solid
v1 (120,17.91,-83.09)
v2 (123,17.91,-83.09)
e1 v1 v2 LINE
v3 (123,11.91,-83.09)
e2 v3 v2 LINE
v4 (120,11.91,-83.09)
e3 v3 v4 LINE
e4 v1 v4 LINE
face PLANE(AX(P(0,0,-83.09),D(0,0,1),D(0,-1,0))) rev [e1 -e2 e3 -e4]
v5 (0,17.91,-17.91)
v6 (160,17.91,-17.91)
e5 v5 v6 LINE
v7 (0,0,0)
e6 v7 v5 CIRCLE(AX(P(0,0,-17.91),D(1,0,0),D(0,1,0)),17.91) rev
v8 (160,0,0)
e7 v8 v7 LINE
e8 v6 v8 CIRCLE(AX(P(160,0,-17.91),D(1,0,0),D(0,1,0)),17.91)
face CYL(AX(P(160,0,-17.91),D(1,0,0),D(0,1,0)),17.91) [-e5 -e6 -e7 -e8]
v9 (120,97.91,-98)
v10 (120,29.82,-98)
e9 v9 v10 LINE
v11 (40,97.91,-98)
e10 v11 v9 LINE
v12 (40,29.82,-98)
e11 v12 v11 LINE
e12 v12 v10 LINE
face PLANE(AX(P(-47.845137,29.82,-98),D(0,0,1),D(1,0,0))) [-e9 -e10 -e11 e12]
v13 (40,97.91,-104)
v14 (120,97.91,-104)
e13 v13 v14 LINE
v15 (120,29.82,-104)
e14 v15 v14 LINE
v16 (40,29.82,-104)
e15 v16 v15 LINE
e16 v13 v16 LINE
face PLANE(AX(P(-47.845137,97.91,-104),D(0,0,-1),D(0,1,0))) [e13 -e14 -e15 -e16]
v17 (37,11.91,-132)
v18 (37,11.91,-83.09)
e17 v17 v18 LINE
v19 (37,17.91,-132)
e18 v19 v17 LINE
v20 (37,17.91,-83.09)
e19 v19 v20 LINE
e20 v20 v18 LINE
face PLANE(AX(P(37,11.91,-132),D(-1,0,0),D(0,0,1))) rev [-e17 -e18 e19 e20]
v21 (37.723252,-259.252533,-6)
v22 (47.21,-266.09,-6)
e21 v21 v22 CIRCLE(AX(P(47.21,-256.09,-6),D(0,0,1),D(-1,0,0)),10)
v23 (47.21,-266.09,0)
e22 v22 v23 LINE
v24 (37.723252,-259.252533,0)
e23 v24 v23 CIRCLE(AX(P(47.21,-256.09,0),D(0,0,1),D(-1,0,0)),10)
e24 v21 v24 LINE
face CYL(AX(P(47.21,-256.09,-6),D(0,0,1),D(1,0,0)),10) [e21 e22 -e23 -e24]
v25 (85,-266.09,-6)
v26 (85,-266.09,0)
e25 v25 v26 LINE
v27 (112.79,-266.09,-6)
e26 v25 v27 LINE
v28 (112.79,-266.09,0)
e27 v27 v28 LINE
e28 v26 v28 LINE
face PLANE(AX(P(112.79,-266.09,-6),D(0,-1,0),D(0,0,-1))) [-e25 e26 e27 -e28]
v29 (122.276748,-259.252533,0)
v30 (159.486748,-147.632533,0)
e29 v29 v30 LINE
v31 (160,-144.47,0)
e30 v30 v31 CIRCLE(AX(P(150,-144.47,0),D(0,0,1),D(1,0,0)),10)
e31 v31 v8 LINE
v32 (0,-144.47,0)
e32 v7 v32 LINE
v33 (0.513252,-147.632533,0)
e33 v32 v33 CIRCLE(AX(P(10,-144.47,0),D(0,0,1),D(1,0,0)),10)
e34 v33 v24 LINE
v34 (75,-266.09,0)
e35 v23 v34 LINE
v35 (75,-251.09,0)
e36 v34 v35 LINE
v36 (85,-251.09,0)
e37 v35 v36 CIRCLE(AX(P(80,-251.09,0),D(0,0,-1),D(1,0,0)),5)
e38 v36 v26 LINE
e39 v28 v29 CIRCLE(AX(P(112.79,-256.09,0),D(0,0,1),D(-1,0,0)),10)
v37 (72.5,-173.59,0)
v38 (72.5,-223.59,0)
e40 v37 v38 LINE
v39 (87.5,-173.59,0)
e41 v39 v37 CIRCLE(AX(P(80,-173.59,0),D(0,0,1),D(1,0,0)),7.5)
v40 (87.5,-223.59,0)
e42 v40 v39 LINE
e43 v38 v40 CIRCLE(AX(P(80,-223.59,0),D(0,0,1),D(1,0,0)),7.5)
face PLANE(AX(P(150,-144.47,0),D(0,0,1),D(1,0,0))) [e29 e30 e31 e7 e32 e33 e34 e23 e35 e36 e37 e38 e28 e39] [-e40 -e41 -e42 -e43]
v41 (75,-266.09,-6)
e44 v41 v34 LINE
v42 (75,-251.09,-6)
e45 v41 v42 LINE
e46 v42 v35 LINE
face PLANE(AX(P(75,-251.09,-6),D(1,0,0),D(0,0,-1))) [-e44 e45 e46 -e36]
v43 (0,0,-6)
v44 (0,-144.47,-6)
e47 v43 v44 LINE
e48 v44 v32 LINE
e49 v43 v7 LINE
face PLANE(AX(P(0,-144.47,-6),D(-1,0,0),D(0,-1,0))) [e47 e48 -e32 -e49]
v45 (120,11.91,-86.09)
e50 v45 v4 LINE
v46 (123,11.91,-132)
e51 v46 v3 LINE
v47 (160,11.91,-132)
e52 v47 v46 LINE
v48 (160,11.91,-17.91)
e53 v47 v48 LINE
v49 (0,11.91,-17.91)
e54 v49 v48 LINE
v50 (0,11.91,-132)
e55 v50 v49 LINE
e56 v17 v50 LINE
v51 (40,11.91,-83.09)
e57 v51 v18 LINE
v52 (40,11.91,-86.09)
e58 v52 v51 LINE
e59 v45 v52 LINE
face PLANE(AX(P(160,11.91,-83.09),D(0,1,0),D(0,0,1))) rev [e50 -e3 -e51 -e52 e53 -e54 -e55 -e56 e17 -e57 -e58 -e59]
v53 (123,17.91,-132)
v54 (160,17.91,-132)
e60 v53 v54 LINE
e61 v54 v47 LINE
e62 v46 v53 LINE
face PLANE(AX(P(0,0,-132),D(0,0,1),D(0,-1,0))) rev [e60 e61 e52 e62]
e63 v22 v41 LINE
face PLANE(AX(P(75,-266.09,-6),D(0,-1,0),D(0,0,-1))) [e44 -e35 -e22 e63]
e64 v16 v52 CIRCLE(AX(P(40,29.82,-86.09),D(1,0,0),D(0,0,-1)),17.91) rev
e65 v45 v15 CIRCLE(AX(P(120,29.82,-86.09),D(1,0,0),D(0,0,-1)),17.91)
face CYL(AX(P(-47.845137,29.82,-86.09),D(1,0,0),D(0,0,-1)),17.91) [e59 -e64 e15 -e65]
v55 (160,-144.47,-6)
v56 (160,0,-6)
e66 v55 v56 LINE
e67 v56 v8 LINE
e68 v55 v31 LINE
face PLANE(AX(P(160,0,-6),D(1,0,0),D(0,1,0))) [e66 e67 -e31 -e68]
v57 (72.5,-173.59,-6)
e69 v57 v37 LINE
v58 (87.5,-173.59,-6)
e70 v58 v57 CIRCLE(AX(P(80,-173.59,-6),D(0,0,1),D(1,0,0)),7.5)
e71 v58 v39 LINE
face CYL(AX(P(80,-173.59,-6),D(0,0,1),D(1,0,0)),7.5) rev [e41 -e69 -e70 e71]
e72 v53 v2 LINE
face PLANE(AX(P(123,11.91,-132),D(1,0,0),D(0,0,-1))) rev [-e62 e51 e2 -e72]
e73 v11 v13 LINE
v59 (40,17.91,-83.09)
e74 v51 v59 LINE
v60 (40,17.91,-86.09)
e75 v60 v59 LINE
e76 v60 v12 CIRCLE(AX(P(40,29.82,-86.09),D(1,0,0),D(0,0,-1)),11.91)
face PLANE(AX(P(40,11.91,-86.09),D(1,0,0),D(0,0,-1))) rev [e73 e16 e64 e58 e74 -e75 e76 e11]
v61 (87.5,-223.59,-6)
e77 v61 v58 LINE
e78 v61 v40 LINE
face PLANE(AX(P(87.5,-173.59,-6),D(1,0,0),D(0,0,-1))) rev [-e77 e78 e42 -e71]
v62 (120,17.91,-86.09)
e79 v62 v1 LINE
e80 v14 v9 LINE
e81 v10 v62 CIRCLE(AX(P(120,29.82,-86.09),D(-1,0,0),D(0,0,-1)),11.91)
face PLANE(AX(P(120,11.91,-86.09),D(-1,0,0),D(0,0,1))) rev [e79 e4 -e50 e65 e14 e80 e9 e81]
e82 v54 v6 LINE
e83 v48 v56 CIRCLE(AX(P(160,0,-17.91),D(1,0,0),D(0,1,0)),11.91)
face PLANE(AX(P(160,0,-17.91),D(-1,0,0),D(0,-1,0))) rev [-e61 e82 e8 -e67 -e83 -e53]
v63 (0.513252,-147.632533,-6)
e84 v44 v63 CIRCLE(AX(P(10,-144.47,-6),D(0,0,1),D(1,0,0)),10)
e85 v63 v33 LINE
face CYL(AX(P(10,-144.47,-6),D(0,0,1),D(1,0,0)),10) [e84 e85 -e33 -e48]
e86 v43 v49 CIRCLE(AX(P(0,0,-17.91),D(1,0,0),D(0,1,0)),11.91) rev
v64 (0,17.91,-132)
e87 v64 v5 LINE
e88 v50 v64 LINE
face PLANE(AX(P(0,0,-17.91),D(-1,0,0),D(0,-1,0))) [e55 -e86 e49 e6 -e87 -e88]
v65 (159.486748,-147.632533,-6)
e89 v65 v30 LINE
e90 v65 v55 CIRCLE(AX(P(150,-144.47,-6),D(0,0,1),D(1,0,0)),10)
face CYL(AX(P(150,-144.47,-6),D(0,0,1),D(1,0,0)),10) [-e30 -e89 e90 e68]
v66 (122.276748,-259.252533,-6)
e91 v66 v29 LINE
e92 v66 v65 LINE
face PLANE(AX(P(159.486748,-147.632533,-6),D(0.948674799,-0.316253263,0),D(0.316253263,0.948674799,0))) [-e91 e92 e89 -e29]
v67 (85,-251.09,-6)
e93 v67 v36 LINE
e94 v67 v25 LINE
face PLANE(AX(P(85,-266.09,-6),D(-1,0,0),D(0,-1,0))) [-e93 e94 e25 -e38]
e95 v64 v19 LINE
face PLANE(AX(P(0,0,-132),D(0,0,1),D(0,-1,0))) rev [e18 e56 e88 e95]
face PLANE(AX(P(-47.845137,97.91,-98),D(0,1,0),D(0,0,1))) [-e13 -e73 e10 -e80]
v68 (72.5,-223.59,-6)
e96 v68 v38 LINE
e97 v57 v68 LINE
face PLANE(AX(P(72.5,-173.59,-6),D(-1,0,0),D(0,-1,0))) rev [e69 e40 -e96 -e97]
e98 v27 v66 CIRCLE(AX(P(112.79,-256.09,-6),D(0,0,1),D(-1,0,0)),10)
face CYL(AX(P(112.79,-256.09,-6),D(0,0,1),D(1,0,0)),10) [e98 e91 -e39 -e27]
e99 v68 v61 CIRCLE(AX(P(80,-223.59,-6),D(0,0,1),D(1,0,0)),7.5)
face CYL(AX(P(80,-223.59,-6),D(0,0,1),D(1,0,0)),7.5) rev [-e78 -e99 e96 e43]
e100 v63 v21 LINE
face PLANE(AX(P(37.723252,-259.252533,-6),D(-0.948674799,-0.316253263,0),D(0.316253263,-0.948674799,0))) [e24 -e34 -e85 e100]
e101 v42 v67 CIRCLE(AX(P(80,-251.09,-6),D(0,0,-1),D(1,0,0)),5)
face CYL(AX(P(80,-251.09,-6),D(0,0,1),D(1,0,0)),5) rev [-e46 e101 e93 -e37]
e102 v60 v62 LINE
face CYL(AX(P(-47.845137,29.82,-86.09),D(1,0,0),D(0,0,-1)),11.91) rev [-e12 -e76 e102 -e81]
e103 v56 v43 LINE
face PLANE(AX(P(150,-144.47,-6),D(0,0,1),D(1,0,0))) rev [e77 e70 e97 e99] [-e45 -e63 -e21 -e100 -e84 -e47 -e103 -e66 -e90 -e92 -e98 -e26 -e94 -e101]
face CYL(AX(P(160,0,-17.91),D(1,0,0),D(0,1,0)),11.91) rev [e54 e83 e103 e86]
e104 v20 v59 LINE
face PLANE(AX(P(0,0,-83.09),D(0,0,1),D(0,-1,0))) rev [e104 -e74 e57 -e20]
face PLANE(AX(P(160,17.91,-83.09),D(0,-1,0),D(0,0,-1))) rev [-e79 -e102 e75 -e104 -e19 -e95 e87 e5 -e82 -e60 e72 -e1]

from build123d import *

# Parameters (mm, degrees)
BASE_FLANGE1_DEPTH  = 6
HEM2_DEPTH          = 160
SKETCH12_W          = 160
SKETCH12_H          = 6
BOSS_EXTRUDE2_DEPTH = 65.18
SKETCH13_W          = 37
SKETCH13_H          = 6
BOSS_EXTRUDE3_DEPTH = 48.91
SKETCH14_W          = 80
SKETCH14_H          = 6
BOSS_EXTRUDE4_DEPTH = 3
BOSS_EXTRUDE5_DEPTH = 80


# Read off the part's stored shape, not the designer's step: Hem2
# Sheet-metal steps are written as plain solids
with BuildPart() as part:
    # Sketch1 → Base-Flange1 (new body)
    with BuildSketch(Plane.XY):
        with BuildLine():
            Line((0, 0), (160, 0))
            Line((160, 0), (160, -144.47))
            ThreePointArc((160, -144.47), (159.87085305, -146.071955078), (159.486747986, -147.632532633))
            Line((159.486747986, -147.632532633), (122.276747986, -259.252532633))
            ThreePointArc((122.276747986, -259.252532633), (118.636993829, -264.202500426), (112.79, -266.09))
            Line((112.79, -266.09), (85, -266.09))
            Line((85, -266.09), (85, -251.09))
            ThreePointArc((85, -251.09), (80, -246.09), (75, -251.09))
            Line((75, -251.09), (75, -266.09))
            Line((75, -266.09), (47.21, -266.09))
            ThreePointArc((47.21, -266.09), (41.363006171, -264.202500426), (37.723252014, -259.252532633))
            Line((37.723252014, -259.252532633), (0.513252014, -147.632532633))
            ThreePointArc((0.513252014, -147.632532633), (0.12914695, -146.071955078), (0, -144.47))
            Line((0, -144.47), (0, 0))
        make_face()
        with BuildLine():
            Line((87.5, -173.59), (87.5, -223.59))
            ThreePointArc((87.5, -223.59), (80, -231.09), (72.5, -223.59))
            Line((72.5, -223.59), (72.5, -173.59))
            ThreePointArc((72.5, -173.59), (80, -166.09), (87.5, -173.59))
        make_face(mode=Mode.SUBTRACT)
    extrude(amount=-BASE_FLANGE1_DEPTH)

    # Hem2 outline → Hem2 (add)
    with BuildSketch(Plane.YZ):
        with BuildLine():
            Line((11.91, -17.91), (17.91, -17.91))
            ThreePointArc((17.91, -17.91), (12.664282451, -5.245717549), (0, 0))
            Line((0, 0), (0, -6))
            ThreePointArc((0, -6), (8.421641764, -9.488358236), (11.91, -17.91))
        make_face()
    extrude(amount=HEM2_DEPTH)

    # Sketch12 → Boss-Extrude2 (add)
    with BuildSketch(Plane(origin=(0, 0, -17.91), x_dir=(-1, 0, 0), z_dir=(0, 0, -1))):
        with Locations((-80, 14.91)):
            Rectangle(SKETCH12_W, SKETCH12_H)
    extrude(amount=BOSS_EXTRUDE2_DEPTH)

    # Sketch13 → Boss-Extrude3 (add)
    with BuildSketch(Plane(origin=(0, 0, -83.09), x_dir=(-1, 0, 0), z_dir=(0, 0, -1))):
        with Locations((-141.5, 14.91)):
            Rectangle(SKETCH13_W, SKETCH13_H)
        with Locations((-18.5, 14.91)):
            Rectangle(SKETCH13_W, SKETCH13_H)
    extrude(amount=BOSS_EXTRUDE3_DEPTH)

    # Sketch14 → Boss-Extrude4 (add)
    with BuildSketch(Plane(origin=(0, 0, -83.09), x_dir=(-1, 0, 0), z_dir=(0, 0, -1))):
        with Locations((-80, 14.91)):
            Rectangle(SKETCH14_W, SKETCH14_H)
    extrude(amount=BOSS_EXTRUDE4_DEPTH)

    # Sketch19 → Boss-Extrude5 (add)
    with BuildSketch(Plane(origin=(120, 0, 0), x_dir=(0, 0, -1), z_dir=(1, 0, 0))):
        with BuildLine():
            Line((98, 29.82), (98, 97.91))
            Line((98, 97.91), (104, 97.91))
            Line((104, 97.91), (104, 29.82))
            ThreePointArc((104, 29.82), (98.754282451, 17.155717549), (86.09, 11.91))
            Line((86.09, 11.91), (86.09, 17.91))
            ThreePointArc((86.09, 17.91), (94.511641764, 21.398358236), (98, 29.82))
        make_face()
    extrude(amount=-BOSS_EXTRUDE5_DEPTH)


solid = part.part
